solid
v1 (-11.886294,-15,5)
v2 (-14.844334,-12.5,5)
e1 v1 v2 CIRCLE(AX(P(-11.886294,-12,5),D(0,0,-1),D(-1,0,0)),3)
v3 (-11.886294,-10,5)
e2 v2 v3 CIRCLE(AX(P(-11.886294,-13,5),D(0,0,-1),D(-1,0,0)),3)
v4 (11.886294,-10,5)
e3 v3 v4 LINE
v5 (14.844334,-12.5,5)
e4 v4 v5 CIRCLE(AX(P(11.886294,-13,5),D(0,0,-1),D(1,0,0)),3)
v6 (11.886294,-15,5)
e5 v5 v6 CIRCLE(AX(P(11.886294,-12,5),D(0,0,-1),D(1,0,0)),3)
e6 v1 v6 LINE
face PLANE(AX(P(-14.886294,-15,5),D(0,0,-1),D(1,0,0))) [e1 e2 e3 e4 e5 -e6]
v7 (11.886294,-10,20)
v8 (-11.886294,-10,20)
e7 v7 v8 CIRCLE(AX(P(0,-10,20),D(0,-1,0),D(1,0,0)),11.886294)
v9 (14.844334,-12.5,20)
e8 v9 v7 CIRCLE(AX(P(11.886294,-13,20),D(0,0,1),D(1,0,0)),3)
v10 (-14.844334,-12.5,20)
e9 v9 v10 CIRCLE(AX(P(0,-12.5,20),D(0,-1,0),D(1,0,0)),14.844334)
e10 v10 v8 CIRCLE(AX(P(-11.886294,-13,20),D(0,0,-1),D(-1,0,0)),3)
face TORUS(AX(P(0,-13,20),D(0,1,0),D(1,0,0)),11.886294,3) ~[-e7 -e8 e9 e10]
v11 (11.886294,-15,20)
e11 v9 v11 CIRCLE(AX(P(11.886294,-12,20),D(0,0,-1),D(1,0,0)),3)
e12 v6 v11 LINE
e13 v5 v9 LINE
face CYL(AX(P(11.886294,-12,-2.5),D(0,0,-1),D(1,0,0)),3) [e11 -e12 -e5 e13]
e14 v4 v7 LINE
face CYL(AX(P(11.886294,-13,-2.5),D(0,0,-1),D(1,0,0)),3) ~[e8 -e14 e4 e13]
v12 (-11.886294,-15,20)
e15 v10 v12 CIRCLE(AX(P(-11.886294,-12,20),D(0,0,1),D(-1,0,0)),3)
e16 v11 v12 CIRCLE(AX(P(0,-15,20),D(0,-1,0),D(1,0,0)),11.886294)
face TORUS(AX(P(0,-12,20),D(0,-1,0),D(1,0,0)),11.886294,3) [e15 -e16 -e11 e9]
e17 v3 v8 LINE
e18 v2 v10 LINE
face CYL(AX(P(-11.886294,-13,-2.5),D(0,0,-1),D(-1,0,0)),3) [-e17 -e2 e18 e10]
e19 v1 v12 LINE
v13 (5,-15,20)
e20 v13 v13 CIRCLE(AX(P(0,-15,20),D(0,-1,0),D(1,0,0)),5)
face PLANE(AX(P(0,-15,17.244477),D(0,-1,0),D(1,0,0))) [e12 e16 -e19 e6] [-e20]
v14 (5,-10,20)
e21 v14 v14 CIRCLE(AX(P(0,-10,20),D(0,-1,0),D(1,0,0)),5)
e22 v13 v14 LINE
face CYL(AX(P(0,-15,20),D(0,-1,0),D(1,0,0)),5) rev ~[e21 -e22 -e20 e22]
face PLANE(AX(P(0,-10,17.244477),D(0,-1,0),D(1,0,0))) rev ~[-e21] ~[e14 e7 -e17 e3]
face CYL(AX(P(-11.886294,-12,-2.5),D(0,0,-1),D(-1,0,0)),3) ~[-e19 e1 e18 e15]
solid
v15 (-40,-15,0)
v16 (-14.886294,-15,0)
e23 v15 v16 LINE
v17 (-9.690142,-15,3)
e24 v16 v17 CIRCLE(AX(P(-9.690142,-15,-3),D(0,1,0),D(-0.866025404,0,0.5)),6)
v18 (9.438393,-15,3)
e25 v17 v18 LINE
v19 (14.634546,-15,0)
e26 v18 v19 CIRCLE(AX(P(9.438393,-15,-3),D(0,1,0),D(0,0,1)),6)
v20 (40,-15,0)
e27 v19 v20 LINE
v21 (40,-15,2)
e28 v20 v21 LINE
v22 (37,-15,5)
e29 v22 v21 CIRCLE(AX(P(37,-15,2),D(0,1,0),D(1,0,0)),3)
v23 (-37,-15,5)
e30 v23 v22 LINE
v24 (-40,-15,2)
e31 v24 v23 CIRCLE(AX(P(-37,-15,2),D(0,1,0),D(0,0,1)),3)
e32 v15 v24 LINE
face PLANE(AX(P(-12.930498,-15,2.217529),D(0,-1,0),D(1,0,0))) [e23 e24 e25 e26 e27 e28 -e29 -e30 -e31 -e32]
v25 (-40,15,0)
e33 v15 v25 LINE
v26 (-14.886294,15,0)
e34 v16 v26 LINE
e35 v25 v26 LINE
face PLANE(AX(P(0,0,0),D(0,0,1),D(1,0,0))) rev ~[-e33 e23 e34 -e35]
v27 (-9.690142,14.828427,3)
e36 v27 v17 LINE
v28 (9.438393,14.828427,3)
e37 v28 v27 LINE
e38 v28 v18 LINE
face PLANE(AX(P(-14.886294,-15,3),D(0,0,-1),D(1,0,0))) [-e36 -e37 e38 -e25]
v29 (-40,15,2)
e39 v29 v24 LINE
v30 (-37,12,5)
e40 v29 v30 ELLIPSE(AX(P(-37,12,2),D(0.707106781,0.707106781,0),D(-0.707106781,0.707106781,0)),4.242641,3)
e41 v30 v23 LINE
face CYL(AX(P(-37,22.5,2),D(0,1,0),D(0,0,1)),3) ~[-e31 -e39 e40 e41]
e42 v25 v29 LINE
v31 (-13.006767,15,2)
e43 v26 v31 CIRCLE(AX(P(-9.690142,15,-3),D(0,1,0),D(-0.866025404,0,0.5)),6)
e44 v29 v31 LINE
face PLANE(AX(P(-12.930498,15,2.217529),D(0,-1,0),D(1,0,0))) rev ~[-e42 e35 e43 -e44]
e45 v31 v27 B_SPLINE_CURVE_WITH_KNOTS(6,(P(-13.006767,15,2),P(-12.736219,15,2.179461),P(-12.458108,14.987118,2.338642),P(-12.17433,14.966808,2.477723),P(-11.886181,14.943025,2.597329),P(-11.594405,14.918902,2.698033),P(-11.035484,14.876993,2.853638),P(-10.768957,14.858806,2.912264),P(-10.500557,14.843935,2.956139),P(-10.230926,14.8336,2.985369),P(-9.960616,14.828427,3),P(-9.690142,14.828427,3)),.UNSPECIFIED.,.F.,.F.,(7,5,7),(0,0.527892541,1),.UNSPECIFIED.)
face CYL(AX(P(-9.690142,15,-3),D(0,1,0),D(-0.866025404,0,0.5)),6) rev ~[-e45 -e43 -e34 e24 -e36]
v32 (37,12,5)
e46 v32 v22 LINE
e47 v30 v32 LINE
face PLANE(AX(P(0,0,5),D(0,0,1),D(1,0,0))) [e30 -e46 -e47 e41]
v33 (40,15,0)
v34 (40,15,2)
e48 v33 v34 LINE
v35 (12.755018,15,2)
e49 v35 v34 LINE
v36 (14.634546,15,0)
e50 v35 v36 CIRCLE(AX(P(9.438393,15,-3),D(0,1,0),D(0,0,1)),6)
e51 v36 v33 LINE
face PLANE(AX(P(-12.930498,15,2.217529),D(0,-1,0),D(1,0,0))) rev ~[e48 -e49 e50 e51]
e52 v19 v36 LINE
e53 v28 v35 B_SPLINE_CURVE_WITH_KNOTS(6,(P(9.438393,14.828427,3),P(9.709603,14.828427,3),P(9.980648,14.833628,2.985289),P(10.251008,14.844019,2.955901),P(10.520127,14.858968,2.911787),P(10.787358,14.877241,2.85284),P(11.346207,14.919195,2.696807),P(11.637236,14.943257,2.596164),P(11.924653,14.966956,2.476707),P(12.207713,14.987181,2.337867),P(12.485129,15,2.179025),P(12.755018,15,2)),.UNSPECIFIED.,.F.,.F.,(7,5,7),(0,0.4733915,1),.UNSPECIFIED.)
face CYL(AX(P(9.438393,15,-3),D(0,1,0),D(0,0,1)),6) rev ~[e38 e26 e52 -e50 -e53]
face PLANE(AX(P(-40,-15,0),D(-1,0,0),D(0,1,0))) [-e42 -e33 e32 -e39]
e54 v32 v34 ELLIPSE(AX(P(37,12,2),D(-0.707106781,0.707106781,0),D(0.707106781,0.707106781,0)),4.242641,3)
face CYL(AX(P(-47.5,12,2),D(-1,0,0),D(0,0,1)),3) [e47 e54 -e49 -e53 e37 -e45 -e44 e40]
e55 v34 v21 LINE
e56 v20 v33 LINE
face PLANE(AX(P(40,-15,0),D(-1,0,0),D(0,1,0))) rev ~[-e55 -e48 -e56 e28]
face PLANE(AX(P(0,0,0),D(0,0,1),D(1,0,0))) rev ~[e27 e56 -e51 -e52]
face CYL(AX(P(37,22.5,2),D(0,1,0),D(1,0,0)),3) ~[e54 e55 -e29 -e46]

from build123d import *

# Parameters (mm, degrees)
F0_W          = 80
F0_H          = 30
F1_DEPTH      = 5
F2_R          = 5
F3_DEPTH      = 5
F4_W          = 29.5208403841
F4_H          = 3
F5_DEPTH      = 30.001
F6_T1_DEPTH   = 30
F7_T1_DEPTH   = 45
F7_T3_DEPTH   = 95
F7_2_T1_DEPTH = 22.5
F7_2_T4_ANGLE = 180
F7_2_T6_ANGLE = 180


# Not quite as in the source:
# - a fillet or chamfer that OpenCascade refuses, or shapes differently, is made with other operations: its cross-section is extruded or revolved along the edge and cut away or added


with BuildPart() as f1:
    # F0 (on Top) → F1 (new body)
    with BuildSketch(Plane.XY):
        Rectangle(F0_W, F0_H)
    extrude(amount=F1_DEPTH)

    # F4 (on face) → F5 (cut, through all)
    with BuildSketch(Plane.XZ.offset(15)):
        with Locations((-0.1258742996, 1.5)):
            Rectangle(F4_W, F4_H)
    extrude(amount=-F5_DEPTH, mode=Mode.SUBTRACT)

    # F6: fillet of radius 6 on 2 edges, made by hand

    # F6_s2 → F6_t1 (join)
    with BuildSketch(Plane.XZ.offset(-15)):
        with BuildLine():
            ThreePointArc((-14.8862944916, 0), (-12.6901420689, 2.1961524227), (-9.6901420689, 3))
            Line((-9.6901420689, 3), (-14.8862944916, 3))
            Line((-14.8862944916, 3), (-14.8862944916, 0))
        make_face()
        with BuildLine():
            ThreePointArc((9.4383934698, 3), (12.4383934698, 2.1961524227), (14.6345458925, 0))
            Line((14.6345458925, 0), (14.6345458925, 3))
            Line((14.6345458925, 3), (9.4383934698, 3))
        make_face()
    extrude(amount=F6_T1_DEPTH)

    # F7: fillet of radius 3 on 3 edges, made by hand

    # F7_s2 → F7_t1 (cut)
    with BuildSketch(Plane.XZ.offset(-22.5)):
        with BuildLine():
            ThreePointArc((40, 2), (39.1213203436, 4.1213203436), (37, 5))
            Line((37, 5), (40, 5))
            Line((40, 5), (40, 2))
        make_face()
        with BuildLine():
            ThreePointArc((-37, 5), (-39.1213203436, 4.1213203436), (-40, 2))
            Line((-40, 2), (-40, 5))
            Line((-40, 5), (-37, 5))
        make_face()
    extrude(amount=F7_T1_DEPTH, mode=Mode.SUBTRACT)

    # F7_s4 → F7_t3 (cut)
    with BuildSketch(Plane.YZ.offset(-47.5)):
        with BuildLine():
            ThreePointArc((12, 5), (14.1213203436, 4.1213203436), (15, 2))
            Line((15, 2), (15, 5))
            Line((15, 5), (12, 5))
        make_face()
    extrude(amount=F7_T3_DEPTH, mode=Mode.SUBTRACT)


with BuildPart() as f3:
    # F2 (on face) → F3 (new body)
    with BuildSketch(Plane.XZ.offset(15)):
        with BuildLine():
            Line((-14.8862944916, 20), (-14.8862944916, 5))
            Line((-14.8862944916, 5), (14.8862944916, 5))
            Line((14.8862944916, 5), (14.8862944916, 20))
            ThreePointArc((14.8862944916, 20), (0, 34.8862944916), (-14.8862944916, 20))
        make_face()
        with Locations((0, 20)):
            Circle(F2_R, mode=Mode.SUBTRACT)
    extrude(amount=-F3_DEPTH)

    # F7#2: fillet of radius 3 on 6 edges, made by hand

    # F7_2_s2 → F7_2_t1 (cut)
    with BuildSketch(Plane.XY.offset(-2.5)):
        with BuildLine():
            ThreePointArc((14.8862944916, -12), (14.0076148351, -14.1213203436), (11.8862944916, -15))
            Line((11.8862944916, -15), (14.8862944916, -15))
            Line((14.8862944916, -15), (14.8862944916, -12))
        make_face()
        with BuildLine():
            ThreePointArc((14.8862944916, -13), (14.0076148351, -10.8786796564), (11.8862944916, -10))
            Line((11.8862944916, -10), (14.8862944916, -10))
            Line((14.8862944916, -10), (14.8862944916, -13))
        make_face()
        with BuildLine():
            ThreePointArc((-14.8862944916, -12), (-14.0076148351, -14.1213203436), (-11.8862944916, -15))
            Line((-11.8862944916, -15), (-14.8862944916, -15))
            Line((-14.8862944916, -15), (-14.8862944916, -12))
        make_face()
        with BuildLine():
            ThreePointArc((-14.8862944916, -13), (-14.0076148351, -10.8786796564), (-11.8862944916, -10))
            Line((-11.8862944916, -10), (-14.8862944916, -10))
            Line((-14.8862944916, -10), (-14.8862944916, -13))
        make_face()
    extrude(amount=F7_2_T1_DEPTH, mode=Mode.SUBTRACT)

    # F7_2_s3 → F7_2_t4 (revolve, cut)
    with BuildSketch(Plane.XY.offset(20)):
        with BuildLine():
            ThreePointArc((14.8862944916, -12), (14.0076148351, -14.1213203436), (11.8862944916, -15))
            Line((11.8862944916, -15), (14.8862944916, -15))
            Line((14.8862944916, -15), (14.8862944916, -12))
        make_face()
    revolve(axis=Axis((0, -15, 20), (0, -1, 0)), revolution_arc=F7_2_T4_ANGLE, mode=Mode.SUBTRACT)

    # F7_2_s5 → F7_2_t6 (revolve, cut)
    with BuildSketch(Plane.XY.offset(20)):
        with BuildLine():
            ThreePointArc((14.8862944916, -13), (14.0076148351, -10.8786796564), (11.8862944916, -10))
            Line((11.8862944916, -10), (14.8862944916, -10))
            Line((14.8862944916, -10), (14.8862944916, -13))
        make_face()
    revolve(axis=Axis((0, -10, 20), (0, -1, 0)), revolution_arc=F7_2_T6_ANGLE, mode=Mode.SUBTRACT)


solid = Compound([f1.part, f3.part])
